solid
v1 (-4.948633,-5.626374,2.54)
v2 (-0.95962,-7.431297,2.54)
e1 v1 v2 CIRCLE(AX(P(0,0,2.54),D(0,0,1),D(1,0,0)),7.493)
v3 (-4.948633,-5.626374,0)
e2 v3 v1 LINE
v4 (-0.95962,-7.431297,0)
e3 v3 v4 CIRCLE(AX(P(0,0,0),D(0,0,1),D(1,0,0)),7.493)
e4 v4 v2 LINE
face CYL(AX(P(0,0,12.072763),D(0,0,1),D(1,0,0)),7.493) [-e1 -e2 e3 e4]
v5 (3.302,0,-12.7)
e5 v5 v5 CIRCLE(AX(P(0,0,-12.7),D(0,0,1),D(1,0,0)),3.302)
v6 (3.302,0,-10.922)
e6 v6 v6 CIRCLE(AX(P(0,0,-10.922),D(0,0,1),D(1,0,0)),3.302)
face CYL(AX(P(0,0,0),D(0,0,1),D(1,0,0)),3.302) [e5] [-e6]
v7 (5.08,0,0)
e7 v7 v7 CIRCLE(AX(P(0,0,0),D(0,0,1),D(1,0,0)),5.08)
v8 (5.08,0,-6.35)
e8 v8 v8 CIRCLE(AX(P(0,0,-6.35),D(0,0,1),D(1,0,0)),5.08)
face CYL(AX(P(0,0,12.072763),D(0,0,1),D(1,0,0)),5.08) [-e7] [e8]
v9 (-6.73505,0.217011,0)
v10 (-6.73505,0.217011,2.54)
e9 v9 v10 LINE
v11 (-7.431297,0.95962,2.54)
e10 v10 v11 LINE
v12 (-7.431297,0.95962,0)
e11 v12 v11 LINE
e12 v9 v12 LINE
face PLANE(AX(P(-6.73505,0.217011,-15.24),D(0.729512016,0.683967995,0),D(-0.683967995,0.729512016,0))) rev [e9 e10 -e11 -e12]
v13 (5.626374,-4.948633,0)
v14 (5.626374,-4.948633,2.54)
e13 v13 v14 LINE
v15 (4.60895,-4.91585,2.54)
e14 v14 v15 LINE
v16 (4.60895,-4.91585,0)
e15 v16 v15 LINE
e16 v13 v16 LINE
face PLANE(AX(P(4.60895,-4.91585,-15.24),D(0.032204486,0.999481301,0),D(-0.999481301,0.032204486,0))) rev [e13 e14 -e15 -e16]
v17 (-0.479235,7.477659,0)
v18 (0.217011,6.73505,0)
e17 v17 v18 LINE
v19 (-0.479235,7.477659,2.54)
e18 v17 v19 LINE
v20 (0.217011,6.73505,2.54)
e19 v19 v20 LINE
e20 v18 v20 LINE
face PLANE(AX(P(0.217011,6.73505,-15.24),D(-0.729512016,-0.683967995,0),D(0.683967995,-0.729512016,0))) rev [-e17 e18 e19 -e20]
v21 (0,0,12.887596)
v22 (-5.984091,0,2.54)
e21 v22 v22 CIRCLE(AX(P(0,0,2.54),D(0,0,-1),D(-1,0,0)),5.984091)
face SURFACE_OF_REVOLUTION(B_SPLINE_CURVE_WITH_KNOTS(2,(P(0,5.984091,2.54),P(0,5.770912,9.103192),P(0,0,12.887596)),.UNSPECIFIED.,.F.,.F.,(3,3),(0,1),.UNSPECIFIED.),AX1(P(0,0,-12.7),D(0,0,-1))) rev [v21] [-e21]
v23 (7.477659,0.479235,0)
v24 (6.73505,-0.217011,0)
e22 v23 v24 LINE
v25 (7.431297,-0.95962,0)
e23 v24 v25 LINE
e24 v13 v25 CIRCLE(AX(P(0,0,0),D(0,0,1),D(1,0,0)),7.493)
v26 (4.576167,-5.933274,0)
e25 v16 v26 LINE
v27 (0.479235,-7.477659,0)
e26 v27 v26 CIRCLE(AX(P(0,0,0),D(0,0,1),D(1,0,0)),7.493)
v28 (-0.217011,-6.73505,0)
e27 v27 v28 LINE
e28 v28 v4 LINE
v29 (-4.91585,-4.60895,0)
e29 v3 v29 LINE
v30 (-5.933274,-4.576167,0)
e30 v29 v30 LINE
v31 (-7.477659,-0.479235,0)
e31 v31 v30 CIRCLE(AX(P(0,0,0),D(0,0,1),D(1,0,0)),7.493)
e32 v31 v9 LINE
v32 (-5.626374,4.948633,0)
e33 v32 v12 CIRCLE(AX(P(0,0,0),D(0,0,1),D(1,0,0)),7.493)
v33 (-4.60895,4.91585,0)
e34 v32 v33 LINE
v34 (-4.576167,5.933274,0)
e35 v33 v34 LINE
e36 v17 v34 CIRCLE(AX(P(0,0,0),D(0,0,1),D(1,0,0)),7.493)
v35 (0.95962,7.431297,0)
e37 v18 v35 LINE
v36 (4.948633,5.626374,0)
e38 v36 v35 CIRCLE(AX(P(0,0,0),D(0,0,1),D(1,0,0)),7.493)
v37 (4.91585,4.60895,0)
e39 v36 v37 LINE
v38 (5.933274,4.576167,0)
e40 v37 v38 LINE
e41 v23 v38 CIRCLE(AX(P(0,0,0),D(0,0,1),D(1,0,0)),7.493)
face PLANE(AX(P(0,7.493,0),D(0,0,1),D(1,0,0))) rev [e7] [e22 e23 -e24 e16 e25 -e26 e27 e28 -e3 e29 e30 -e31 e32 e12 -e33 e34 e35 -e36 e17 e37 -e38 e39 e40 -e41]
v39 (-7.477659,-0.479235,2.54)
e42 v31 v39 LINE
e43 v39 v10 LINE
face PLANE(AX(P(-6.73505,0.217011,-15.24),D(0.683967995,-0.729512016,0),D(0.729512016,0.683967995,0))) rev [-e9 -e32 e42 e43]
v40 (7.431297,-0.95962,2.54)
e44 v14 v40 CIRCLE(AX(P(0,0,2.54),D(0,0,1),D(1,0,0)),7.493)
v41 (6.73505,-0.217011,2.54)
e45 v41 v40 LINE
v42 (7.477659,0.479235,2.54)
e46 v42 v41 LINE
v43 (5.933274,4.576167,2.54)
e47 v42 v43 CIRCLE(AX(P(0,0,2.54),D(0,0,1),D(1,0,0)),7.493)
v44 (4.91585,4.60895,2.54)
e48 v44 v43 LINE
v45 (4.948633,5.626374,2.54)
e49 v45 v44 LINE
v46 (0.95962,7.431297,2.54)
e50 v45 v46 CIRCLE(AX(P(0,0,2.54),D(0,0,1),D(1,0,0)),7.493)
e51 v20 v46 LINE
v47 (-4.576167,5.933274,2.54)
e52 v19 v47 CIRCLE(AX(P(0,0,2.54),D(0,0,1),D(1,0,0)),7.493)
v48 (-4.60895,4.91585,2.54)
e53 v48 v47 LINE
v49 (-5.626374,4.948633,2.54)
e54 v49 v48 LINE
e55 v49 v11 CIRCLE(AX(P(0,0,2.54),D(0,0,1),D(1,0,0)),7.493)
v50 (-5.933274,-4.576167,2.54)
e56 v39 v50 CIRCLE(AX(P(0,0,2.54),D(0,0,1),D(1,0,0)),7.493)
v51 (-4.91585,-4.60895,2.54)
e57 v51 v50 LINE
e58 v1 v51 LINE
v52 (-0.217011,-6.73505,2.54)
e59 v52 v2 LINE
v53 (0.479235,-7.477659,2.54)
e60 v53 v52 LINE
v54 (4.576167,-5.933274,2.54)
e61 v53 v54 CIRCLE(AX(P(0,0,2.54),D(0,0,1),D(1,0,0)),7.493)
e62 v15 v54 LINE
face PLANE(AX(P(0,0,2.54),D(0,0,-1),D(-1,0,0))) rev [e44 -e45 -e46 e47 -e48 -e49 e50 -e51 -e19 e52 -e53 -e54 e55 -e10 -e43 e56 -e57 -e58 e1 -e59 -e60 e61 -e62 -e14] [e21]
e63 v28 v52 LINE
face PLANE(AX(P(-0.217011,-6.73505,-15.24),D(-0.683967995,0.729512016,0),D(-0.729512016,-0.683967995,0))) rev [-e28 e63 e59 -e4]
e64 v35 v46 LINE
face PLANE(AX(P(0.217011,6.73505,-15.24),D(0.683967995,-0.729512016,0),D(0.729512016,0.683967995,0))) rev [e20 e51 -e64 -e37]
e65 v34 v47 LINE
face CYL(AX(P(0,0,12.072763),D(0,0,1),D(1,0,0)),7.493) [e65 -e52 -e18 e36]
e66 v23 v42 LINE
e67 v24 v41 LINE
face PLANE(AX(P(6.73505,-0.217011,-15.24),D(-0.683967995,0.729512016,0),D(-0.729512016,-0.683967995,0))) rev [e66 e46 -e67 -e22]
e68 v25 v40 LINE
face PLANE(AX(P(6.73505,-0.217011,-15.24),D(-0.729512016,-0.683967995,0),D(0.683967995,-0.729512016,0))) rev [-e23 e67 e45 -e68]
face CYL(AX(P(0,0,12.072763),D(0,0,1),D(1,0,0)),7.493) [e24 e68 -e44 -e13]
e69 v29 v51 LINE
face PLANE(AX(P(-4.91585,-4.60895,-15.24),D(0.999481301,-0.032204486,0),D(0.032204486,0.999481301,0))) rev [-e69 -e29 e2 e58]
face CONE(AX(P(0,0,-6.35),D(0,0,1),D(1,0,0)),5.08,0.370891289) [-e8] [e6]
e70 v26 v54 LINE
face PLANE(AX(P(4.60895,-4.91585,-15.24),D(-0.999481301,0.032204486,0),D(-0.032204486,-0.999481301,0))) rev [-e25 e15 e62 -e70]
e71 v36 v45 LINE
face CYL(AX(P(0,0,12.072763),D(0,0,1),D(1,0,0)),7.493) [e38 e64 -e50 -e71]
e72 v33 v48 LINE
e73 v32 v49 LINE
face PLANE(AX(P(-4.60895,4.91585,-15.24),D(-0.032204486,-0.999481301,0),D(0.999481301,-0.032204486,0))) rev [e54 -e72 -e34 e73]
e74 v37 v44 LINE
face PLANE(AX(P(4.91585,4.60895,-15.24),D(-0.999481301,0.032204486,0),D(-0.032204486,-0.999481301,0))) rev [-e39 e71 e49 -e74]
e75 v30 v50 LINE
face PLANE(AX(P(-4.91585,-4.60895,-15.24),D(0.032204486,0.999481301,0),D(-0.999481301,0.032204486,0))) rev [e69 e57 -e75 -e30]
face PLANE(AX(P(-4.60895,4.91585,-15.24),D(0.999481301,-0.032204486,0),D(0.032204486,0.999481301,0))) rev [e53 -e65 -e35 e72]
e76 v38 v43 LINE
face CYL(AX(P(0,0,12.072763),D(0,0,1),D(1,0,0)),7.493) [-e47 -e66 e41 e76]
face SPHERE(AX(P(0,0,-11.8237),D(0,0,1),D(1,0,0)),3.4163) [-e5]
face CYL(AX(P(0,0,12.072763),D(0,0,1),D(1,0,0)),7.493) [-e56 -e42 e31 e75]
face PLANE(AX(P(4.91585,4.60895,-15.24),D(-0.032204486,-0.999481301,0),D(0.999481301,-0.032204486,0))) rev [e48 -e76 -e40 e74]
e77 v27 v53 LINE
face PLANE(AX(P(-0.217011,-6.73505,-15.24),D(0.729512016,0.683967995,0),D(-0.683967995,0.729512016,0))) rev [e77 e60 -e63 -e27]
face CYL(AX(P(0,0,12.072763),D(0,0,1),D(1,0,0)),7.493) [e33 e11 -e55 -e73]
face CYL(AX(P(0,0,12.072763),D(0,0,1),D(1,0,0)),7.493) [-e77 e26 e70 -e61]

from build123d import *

# Parameters (mm, degrees)
DOME1_FACE_RADIUS = 3.302
DOME1_HEIGHT      = 2.54
SEEDCUT_DEPTH     = 21.698272826
CIRPATTERN1_COUNT = 8


# Read off the part's stored shape, not the designer's step: Cut-Revolve-Thin4
with BuildPart() as part:
    # Sketch1 → Revolve1 (revolve)
    with BuildSketch(Plane(origin=(0, 0, 0), x_dir=(0, 0, -1), z_dir=(1, 0, 0)), mode=Mode.PRIVATE) as revolve1_sk:
        Polygon((-2.54, 0), (-2.54, 7.493), (0, 7.493), (0, 5.08), (12.7, 5.08), (12.7, 0), align=None)
    revolve(revolve1_sk.sketch.rotate(Axis((0, 0, 12.072762836), (0, 0, -1)), 90), axis=Axis((0, 0, 12.072762836), (0, 0, -1)))

    # Sketch3 → Revolve2 (revolve)
    with BuildSketch(Plane(origin=(0, 0, 0), x_dir=(0, 0, -1), z_dir=(1, 0, 0))):
        with BuildLine():
            Line((-12.887595566, 0), (-2.54, 0))
            Line((-2.54, 0), (-2.54, 5.984091271))
            add(Edge.make_bspline(
                [(-2.54, 5.984091271), (-9.10319215, 5.770912184), (-12.887595566, 0)],
                knots=[0, 0, 0, 1, 1, 1], degree=2))
        make_face()
    revolve(axis=Axis((0, 0, 12.072762836), (0, 0, 1)))

    # Cut-Revolve-Thin4 outline → Cut-Revolve-Thin4 (revolve, cut)
    with BuildSketch(Plane.XZ):
        Polygon((3.302, -10.922), (3.302, -12.7), (5.08, -12.7), (5.08, -6.35), align=None)
    revolve(axis=Axis((0, 0, 0), (0, 0, 1)), mode=Mode.SUBTRACT)

    # Dome1: a dome of height H over a round flat face of radius A is a cap of a sphere of radius (A * A + H * H) / (2 * H)
    dome1_r = (DOME1_FACE_RADIUS * DOME1_FACE_RADIUS + DOME1_HEIGHT * DOME1_HEIGHT) / (2 * DOME1_HEIGHT)
    dome1_base = Plane((0, 0, -12.7), z_dir=(0, 0, -1))
    with Locations(dome1_base.offset(DOME1_HEIGHT - dome1_r)):
        dome1_ball = Sphere(dome1_r, mode=Mode.PRIVATE)
    add(split(dome1_ball, bisect_by=dome1_base, keep=Keep.TOP, mode=Mode.PRIVATE))

    # Sketch6 → SeedCut (cut, through all)
    with BuildSketch(Plane.XY.offset(2.54)):
        with BuildLine():
            Line((0.217011402, 6.735050359), (0.959619925, 7.431297235))
            ThreePointArc((0.959619925, 7.431297235), (0.241308217, 7.489113388), (-0.479235475, 7.477658882))
            Line((-0.479235475, 7.477658882), (0.217011402, 6.735050359))
        make_face()
    seedcut = extrude(amount=-SEEDCUT_DEPTH, mode=Mode.SUBTRACT)

    # CirPattern1: SeedCut ×8 about axis
    cirpattern1_axis = Axis((0, 0, 0), (0, 0, 1))
    for i in range(1, CIRPATTERN1_COUNT):
        add(seedcut.rotate(cirpattern1_axis, i * 360 / CIRPATTERN1_COUNT), mode=Mode.SUBTRACT)


solid = part.part
